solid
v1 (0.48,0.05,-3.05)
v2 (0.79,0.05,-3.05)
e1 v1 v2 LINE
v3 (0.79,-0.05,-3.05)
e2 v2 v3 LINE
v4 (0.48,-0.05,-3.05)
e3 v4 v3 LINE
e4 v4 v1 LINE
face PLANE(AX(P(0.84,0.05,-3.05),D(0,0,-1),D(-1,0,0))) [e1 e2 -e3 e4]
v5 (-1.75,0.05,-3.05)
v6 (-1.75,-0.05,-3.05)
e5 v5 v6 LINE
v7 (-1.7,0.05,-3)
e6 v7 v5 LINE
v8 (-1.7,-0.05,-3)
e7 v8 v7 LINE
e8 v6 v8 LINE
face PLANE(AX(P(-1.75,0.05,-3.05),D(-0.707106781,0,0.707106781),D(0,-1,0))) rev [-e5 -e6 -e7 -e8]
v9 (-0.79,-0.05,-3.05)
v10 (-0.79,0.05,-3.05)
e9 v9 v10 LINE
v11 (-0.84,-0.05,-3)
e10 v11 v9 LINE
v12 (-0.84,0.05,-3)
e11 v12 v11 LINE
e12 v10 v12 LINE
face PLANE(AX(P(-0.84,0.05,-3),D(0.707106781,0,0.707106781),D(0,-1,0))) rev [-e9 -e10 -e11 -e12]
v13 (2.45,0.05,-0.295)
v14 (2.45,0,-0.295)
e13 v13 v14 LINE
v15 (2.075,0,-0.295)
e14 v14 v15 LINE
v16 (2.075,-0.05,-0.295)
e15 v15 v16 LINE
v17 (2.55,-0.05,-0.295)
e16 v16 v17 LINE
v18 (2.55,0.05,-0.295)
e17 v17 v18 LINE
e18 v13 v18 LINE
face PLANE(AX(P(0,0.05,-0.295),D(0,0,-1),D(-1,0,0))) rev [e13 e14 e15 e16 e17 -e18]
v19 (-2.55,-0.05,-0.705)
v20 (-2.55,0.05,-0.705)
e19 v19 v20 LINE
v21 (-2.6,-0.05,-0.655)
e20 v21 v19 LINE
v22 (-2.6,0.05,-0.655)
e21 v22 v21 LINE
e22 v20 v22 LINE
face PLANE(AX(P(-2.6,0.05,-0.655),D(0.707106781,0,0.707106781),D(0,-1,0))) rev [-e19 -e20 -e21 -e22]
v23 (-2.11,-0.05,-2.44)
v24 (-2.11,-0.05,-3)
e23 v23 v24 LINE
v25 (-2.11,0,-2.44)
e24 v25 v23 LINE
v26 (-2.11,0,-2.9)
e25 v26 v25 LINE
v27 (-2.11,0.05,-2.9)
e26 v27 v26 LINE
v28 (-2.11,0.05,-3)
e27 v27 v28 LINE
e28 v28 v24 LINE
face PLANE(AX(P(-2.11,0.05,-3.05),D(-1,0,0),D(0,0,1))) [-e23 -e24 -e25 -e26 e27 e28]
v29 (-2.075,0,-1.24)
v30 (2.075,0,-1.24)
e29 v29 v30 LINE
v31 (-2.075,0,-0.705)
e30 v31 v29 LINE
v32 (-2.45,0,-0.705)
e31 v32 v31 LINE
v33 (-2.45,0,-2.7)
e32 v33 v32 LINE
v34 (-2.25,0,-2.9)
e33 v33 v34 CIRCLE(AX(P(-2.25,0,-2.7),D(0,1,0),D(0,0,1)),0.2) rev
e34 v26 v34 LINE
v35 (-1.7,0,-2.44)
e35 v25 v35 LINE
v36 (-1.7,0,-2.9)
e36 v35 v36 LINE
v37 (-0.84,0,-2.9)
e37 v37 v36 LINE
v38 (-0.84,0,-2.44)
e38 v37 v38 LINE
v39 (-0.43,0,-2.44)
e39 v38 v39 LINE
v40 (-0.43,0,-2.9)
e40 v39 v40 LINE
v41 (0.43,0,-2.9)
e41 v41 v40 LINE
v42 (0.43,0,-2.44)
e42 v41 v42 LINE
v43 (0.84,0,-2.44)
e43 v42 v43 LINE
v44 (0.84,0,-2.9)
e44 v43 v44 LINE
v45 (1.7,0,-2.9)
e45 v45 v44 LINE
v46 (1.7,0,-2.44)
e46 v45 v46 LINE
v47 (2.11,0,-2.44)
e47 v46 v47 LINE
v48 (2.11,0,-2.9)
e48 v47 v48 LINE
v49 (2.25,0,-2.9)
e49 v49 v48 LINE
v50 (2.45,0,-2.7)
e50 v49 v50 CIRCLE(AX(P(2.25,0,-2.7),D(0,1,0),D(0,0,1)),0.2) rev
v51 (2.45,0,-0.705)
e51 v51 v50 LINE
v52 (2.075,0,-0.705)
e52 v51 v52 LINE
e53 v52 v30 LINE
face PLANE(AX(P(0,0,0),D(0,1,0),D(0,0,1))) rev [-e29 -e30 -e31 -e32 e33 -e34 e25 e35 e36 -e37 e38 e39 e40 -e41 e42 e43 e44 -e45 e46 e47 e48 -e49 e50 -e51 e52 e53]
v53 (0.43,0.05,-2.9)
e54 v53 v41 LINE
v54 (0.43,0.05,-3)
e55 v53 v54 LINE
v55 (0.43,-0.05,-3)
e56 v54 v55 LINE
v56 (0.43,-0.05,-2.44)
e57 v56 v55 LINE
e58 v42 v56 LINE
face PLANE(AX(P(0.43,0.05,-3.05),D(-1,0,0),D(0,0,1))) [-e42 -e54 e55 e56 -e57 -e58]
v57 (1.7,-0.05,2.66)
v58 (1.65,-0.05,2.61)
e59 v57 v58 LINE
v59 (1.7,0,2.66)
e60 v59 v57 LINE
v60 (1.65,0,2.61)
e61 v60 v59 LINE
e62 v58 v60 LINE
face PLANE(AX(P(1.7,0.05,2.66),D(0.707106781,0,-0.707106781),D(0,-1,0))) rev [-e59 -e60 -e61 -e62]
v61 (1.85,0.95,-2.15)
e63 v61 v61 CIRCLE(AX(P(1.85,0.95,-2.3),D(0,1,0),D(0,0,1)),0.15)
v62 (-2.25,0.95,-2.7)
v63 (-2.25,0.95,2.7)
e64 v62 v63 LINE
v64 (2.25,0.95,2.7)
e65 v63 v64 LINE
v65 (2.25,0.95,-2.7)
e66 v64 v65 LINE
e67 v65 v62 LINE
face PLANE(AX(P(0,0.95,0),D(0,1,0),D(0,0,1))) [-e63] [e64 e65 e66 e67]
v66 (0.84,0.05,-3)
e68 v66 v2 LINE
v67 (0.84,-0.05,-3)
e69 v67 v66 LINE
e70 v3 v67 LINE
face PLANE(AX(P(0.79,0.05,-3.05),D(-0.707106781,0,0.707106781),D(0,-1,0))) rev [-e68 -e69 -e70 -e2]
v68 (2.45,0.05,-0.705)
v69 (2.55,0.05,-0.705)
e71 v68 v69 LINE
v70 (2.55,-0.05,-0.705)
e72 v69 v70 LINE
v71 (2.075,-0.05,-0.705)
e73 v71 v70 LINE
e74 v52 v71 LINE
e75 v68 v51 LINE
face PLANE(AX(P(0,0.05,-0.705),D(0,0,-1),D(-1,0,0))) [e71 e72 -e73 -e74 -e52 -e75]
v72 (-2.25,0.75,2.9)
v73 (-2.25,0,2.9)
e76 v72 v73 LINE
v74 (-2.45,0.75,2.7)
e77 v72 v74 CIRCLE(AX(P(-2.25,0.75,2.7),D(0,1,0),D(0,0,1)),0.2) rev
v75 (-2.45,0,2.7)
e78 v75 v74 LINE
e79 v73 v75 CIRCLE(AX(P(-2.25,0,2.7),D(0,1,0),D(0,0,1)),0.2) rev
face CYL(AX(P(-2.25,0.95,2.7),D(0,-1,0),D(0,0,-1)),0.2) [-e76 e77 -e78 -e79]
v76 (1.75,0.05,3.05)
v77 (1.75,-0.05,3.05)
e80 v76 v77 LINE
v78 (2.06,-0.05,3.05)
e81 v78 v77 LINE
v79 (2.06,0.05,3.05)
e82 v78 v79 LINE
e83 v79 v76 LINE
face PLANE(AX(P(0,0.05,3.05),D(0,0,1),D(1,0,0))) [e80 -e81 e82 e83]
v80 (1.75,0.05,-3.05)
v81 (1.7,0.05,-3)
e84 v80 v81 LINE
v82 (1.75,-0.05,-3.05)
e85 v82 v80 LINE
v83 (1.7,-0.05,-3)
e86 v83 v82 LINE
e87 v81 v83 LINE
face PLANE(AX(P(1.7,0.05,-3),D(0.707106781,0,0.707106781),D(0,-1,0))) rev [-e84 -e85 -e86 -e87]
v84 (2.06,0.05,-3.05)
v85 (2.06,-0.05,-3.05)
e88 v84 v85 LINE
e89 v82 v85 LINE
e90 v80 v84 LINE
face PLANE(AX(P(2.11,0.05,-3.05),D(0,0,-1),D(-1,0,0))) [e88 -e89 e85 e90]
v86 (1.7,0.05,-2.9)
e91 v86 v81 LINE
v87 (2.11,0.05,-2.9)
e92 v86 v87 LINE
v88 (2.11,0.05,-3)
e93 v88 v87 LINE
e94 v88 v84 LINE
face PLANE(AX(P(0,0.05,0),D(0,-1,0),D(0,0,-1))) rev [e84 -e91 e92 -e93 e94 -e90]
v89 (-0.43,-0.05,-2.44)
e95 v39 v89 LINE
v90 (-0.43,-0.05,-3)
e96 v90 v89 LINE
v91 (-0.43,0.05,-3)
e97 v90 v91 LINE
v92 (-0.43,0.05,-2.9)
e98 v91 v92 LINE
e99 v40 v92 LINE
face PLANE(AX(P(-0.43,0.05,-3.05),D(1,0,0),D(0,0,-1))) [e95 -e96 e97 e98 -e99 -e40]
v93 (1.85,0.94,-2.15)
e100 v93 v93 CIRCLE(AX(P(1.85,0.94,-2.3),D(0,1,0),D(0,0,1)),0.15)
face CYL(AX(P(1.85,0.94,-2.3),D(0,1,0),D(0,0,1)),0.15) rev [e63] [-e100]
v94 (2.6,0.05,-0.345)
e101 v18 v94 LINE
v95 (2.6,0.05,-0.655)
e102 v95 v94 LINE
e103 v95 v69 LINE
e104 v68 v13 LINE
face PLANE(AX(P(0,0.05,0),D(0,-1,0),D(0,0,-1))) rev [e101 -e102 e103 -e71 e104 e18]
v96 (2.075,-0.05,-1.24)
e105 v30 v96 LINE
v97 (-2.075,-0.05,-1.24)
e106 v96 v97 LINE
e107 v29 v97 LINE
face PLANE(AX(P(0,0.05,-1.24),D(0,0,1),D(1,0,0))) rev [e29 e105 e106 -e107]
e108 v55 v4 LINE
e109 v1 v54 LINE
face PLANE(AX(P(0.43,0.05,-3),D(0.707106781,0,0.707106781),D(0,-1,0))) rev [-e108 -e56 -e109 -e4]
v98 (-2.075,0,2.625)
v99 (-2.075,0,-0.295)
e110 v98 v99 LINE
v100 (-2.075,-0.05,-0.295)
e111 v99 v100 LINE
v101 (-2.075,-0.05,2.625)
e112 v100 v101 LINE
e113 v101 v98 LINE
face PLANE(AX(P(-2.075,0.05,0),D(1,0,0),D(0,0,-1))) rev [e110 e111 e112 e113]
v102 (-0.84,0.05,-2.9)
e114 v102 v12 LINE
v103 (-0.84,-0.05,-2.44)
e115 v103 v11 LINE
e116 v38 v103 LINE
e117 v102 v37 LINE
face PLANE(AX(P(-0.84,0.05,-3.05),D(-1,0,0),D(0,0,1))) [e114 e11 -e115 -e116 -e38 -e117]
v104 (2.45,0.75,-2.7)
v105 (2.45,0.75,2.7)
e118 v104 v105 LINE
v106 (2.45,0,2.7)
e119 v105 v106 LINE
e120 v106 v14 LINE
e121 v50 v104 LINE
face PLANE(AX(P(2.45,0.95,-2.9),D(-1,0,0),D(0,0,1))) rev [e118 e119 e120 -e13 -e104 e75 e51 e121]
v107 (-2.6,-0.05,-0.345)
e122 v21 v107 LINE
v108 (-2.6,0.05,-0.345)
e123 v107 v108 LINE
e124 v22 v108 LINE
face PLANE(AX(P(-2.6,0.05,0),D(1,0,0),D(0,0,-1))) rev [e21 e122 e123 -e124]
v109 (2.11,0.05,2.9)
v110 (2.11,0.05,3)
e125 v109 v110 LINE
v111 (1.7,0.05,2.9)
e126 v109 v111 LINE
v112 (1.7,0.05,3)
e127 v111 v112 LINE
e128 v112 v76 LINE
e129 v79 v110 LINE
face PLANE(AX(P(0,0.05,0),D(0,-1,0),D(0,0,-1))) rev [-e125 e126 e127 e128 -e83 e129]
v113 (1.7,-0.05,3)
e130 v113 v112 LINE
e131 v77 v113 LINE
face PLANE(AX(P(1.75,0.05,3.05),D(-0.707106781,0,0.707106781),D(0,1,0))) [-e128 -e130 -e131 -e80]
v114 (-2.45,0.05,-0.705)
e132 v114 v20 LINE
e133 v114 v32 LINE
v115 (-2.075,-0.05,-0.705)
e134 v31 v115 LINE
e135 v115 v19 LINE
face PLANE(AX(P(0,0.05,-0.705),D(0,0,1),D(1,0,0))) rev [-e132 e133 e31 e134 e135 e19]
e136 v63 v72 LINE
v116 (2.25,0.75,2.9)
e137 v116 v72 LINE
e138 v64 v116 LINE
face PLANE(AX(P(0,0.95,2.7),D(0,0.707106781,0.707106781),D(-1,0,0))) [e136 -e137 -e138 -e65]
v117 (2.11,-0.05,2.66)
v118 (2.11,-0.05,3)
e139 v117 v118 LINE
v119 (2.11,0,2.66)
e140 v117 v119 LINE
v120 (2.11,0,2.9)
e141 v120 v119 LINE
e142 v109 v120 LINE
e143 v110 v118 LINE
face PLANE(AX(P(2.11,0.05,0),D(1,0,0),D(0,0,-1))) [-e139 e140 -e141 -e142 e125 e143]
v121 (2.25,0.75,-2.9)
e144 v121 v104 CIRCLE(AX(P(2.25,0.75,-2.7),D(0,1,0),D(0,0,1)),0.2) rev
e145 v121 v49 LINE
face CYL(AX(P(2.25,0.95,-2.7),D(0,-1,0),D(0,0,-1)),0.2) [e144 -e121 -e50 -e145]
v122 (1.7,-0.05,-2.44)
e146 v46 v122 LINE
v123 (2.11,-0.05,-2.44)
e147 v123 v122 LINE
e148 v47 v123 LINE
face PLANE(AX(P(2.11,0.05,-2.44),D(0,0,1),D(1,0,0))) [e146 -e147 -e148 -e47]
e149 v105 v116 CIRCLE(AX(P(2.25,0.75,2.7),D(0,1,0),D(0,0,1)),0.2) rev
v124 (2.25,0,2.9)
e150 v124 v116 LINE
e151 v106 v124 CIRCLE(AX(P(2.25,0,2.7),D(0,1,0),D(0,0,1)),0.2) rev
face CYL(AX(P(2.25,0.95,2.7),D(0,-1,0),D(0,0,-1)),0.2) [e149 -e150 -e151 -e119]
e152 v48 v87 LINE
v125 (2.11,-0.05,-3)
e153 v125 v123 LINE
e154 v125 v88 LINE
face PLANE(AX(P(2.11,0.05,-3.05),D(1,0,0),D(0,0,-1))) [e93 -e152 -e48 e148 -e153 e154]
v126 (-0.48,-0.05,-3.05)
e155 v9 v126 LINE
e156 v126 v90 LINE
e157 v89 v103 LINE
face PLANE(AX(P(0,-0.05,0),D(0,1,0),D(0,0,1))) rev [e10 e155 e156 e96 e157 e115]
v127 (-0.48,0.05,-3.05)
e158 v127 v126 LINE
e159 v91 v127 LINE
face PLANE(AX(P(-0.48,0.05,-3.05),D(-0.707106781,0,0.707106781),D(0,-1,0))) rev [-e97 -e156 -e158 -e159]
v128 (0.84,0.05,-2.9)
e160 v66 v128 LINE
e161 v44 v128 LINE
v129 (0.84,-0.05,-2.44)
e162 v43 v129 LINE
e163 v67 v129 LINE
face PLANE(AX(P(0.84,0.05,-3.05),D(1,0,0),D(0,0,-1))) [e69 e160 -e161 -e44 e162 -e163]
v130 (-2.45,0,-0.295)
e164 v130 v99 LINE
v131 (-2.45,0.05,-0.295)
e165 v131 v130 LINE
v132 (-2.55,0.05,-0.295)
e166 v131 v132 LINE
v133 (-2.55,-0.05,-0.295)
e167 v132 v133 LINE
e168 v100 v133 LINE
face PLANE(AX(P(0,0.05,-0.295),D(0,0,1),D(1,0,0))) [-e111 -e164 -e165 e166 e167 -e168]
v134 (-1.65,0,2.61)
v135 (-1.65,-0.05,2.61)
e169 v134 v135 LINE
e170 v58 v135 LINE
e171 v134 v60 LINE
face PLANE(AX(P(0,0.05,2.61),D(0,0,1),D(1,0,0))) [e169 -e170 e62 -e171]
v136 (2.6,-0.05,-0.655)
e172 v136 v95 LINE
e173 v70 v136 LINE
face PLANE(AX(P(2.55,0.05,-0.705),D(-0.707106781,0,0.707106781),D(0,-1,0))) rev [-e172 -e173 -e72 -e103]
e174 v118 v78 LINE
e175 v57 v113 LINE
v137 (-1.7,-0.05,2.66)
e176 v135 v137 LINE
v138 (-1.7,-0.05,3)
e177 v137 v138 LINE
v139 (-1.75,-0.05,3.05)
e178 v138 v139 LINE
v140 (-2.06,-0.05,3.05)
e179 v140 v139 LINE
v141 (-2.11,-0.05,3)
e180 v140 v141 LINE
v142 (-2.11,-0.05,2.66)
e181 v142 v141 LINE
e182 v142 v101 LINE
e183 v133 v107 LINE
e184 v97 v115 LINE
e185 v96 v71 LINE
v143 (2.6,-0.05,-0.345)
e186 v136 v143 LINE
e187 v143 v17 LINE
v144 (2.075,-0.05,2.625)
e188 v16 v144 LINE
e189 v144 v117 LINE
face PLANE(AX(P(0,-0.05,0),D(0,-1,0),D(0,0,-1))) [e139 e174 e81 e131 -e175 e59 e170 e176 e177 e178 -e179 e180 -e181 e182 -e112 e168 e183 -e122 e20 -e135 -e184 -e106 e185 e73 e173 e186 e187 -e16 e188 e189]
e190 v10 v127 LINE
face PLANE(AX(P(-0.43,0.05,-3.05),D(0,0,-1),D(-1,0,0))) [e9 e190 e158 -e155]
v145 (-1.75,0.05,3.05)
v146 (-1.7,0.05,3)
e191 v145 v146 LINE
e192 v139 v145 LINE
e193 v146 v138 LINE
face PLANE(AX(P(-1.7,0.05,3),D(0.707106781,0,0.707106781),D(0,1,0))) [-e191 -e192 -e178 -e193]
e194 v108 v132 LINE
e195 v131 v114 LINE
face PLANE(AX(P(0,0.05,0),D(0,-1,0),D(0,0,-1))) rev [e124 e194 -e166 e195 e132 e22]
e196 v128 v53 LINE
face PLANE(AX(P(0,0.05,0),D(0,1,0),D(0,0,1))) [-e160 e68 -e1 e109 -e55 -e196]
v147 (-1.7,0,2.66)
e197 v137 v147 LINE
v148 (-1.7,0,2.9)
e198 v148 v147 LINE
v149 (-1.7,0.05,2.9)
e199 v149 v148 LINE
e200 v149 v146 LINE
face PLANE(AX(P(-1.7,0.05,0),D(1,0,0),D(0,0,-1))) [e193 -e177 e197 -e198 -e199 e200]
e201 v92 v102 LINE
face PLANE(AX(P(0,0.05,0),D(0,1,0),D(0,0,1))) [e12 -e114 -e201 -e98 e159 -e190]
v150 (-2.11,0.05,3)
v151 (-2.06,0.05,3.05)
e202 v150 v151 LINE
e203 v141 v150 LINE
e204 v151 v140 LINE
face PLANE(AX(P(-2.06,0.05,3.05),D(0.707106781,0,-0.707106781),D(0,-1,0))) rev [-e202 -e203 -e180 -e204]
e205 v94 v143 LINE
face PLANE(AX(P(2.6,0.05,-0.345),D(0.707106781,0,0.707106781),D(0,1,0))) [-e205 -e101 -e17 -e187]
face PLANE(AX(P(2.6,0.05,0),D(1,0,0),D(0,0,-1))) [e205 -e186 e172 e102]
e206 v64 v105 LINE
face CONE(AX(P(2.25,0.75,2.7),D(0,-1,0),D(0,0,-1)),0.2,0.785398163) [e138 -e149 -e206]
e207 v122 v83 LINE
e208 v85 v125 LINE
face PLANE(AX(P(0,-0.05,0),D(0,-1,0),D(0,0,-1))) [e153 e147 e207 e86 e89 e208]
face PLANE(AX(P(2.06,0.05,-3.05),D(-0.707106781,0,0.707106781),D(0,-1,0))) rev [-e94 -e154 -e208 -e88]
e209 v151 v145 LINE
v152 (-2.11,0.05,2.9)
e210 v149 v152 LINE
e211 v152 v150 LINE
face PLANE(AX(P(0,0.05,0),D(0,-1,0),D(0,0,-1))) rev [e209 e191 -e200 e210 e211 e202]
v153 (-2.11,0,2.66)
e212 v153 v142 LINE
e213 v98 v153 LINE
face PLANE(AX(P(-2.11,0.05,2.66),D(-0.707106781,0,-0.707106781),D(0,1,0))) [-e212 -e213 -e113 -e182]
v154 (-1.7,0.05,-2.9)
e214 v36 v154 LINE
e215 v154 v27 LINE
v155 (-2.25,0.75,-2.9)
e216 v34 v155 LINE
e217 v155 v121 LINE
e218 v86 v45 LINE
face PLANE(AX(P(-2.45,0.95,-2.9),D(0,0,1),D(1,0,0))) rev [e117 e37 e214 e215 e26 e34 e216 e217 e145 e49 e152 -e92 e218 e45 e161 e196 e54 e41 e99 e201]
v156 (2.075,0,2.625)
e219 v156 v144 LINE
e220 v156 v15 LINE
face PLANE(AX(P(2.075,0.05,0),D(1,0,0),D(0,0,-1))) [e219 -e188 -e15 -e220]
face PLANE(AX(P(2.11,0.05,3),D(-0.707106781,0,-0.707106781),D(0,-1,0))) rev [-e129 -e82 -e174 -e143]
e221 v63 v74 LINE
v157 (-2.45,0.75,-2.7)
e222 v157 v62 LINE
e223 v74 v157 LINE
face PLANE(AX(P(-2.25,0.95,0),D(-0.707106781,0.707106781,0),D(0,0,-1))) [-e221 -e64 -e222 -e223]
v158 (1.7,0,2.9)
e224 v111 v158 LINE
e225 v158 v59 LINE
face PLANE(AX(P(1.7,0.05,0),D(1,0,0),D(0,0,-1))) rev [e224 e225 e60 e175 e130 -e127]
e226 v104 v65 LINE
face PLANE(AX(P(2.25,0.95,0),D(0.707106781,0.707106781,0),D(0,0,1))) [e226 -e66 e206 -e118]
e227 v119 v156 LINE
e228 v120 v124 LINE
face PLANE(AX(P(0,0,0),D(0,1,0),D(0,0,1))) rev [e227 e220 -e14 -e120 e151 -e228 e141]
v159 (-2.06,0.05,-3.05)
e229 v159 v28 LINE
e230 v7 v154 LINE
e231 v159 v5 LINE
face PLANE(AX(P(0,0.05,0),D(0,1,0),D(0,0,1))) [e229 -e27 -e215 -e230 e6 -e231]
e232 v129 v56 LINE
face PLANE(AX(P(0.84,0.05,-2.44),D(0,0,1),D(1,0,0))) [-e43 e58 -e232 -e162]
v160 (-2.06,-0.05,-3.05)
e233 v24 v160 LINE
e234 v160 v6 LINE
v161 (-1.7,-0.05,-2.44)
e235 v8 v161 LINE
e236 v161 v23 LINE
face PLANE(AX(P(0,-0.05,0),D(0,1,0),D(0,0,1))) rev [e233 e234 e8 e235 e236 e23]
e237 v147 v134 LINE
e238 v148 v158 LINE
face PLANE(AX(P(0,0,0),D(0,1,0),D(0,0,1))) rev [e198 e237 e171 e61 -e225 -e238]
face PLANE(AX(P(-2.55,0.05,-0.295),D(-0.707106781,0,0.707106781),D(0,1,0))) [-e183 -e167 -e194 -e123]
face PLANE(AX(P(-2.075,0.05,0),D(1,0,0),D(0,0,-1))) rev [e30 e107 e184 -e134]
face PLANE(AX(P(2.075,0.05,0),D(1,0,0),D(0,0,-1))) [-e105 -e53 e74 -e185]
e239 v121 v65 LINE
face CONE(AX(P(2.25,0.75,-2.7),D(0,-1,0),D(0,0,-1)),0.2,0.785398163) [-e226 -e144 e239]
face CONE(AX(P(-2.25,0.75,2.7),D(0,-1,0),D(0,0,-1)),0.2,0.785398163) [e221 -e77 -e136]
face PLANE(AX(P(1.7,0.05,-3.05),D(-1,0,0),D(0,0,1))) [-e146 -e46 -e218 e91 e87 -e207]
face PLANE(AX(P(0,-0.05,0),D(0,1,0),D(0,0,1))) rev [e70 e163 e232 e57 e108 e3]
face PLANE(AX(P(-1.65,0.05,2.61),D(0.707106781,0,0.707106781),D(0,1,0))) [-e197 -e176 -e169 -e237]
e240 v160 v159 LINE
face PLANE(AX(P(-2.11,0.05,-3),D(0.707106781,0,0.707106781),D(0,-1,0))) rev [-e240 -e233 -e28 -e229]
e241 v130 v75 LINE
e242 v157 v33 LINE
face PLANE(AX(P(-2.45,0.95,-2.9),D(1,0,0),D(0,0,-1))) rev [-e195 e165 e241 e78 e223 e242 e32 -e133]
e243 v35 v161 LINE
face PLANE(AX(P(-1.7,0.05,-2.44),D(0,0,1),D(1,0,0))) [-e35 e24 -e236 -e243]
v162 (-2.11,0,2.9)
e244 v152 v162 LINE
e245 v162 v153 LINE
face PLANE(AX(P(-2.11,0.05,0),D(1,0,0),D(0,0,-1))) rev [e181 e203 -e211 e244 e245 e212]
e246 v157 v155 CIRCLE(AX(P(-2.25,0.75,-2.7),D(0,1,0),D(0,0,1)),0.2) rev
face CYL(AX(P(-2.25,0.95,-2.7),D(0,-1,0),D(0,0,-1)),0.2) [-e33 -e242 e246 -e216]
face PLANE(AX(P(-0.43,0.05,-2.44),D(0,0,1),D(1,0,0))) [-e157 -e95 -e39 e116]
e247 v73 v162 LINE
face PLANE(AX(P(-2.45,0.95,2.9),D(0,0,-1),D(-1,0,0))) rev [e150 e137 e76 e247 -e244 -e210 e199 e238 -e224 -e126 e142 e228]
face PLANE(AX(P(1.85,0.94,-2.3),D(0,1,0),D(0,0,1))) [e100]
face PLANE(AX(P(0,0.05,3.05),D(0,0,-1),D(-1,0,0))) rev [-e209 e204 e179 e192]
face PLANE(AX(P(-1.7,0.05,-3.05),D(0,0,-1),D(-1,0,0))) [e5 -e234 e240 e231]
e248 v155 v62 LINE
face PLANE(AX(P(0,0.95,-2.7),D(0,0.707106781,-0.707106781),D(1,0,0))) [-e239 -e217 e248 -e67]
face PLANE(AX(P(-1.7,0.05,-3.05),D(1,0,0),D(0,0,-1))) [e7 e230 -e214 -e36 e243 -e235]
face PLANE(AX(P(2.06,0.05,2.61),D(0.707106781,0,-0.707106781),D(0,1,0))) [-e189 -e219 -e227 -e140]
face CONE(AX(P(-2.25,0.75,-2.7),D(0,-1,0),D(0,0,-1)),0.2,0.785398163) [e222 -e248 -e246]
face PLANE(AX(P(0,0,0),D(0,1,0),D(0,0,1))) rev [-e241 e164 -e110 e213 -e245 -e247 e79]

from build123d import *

# Parameters (mm, degrees)
SKETCH_1_W           = 4.9
SKETCH_1_H           = 5.8
EXTRUDE_1_DEPTH      = 0.95
FILLET_1_R           = 0.2
CHAMFER_1_SIZE       = 0.2
EXTRUDE_2_DEPTH      = 0.05
EXTRUDE_2_DEPTH_BACK = 0.05
SKETCH_2_W           = 0.41
SKETCH_2_H           = 0.61
CHAMFER_2_SIZE       = 0.05
EXTRUDE_3_DEPTH      = 0.05
EXTRUDE_3_DEPTH_BACK = 0.05
SKETCH_3_W           = 4.15
SKETCH_3_H           = 3.85
SKETCH_3_W_2         = 0.41
SKETCH_3_H_2         = 0.15
SKETCH_3_W_3         = 0.375
SKETCH_3_H_3         = 0.41
SKETCH_3_W_4         = 0.15
CHAMFER_3_SIZE       = 0.05
SKETCH_4_R           = 0.15
CUT_EXTRUDE_1_DEPTH  = 0.01


with BuildPart() as part:
    # Эскиз1 → Бобышка-Вытянуть1 (new body)
    with BuildSketch(Plane(origin=(0, 0, 0), x_dir=(1, 0, 0), z_dir=(0, 1, 0))):
        Rectangle(SKETCH_1_W, SKETCH_1_H)
    extrude(amount=EXTRUDE_1_DEPTH)

    # Скругление1
    fillet_1_edges = [part.edges().sort_by_distance(p)[0] for p in [
        (2.45, 0.475, 2.9),
        (-2.45, 0.475, 2.9),
        (-2.45, 0.475, -2.9),
        (2.45, 0.475, -2.9),
    ]]
    fillet(fillet_1_edges, radius=FILLET_1_R)

    # Фаска1
    chamfer_1_edges = [part.edges().sort_by_distance(p)[0] for p in [
        (-2.45, 0.95, 0),
        (0, 0.95, -2.9),
        (2.45, 0.95, 0),
        (0, 0.95, 2.9),
        (2.391421356, 0.95, 2.841421356),
        (-2.391421356, 0.95, 2.841421356),
        (2.391421356, 0.95, -2.841421356),
        (-2.391421356, 0.95, -2.841421356),
    ]]
    chamfer(chamfer_1_edges, length=CHAMFER_1_SIZE)

    # Эскиз2 → Бобышка-Вытянуть2 (add, two sides: drawn at the far end of the back side and taken through both)
    with BuildSketch(Plane.XZ.offset(-EXTRUDE_2_DEPTH_BACK)):
        with Locations((0.635, -2.745)):
            Rectangle(SKETCH_2_W, SKETCH_2_H)
        with Locations((1.905, -2.745)):
            Rectangle(SKETCH_2_W, SKETCH_2_H)
        with Locations((-0.635, -2.745)):
            Rectangle(SKETCH_2_W, SKETCH_2_H)
        with Locations((-1.905, -2.745)):
            Rectangle(SKETCH_2_W, SKETCH_2_H)
    extrude(amount=EXTRUDE_2_DEPTH + EXTRUDE_2_DEPTH_BACK)

    # Фаска2
    chamfer_2_edges = [part.edges().sort_by_distance(p)[0] for p in [
        (-2.11, 0, -3.05),
        (-1.7, 0, -3.05),
        (1.7, 0, -3.05),
        (2.11, 0, -3.05),
        (0.43, 0, -3.05),
        (0.84, 0, -3.05),
        (-0.84, 0, -3.05),
        (-0.43, 0, -3.05),
    ]]
    chamfer(chamfer_2_edges, length=CHAMFER_2_SIZE)

    # Эскиз3 → Бобышка-Вытянуть3 (add, two sides: drawn at the far end of the back side and taken through both)
    with BuildSketch(Plane.XZ.offset(-EXTRUDE_3_DEPTH_BACK)):
        with Locations((0, 0.685)):
            Rectangle(SKETCH_3_W, SKETCH_3_H)
        with Locations((1.905, 2.975)):
            Rectangle(SKETCH_3_W_2, SKETCH_3_H_2)
        Polygon((1.7, 2.61), (2.075, 2.61), (2.11, 2.61), (2.11, 2.9), (1.7, 2.9), align=None)
        with Locations((-1.905, 2.975)):
            Rectangle(SKETCH_3_W_2, SKETCH_3_H_2)
        Polygon((-2.11, 2.61), (-2.075, 2.61), (-1.7, 2.61), (-1.7, 2.9), (-2.11, 2.9), align=None)
        with Locations((2.2625, -0.5)):
            Rectangle(SKETCH_3_W_3, SKETCH_3_H_3)
        with Locations((2.525, -0.5)):
            Rectangle(SKETCH_3_W_4, SKETCH_3_H_3)
        with Locations((-2.2625, -0.5)):
            Rectangle(SKETCH_3_W_3, SKETCH_3_H_3)
        with Locations((-2.525, -0.5)):
            Rectangle(SKETCH_3_W_4, SKETCH_3_H_3)
    extrude(amount=EXTRUDE_3_DEPTH + EXTRUDE_3_DEPTH_BACK)

    # Фаска3
    # the kernel refuses this chamfer: 0.05 mm, written as the material it adds along each edge
    with BuildSketch(Plane(origin=(-1.7, -0.05, 2.61), x_dir=(-0.02749587661058742, 0, 0.9996219169112966), z_dir=(0, 1, 0)), Plane(origin=(1.7, -0.05, 2.61), x_dir=(-0.9996219169112966, 0, -0.02749587661058718), z_dir=(0, 1, 0))) as chamfer_3_piece_1:
        Polygon((CHAMFER_3_SIZE * 0.999621916911, CHAMFER_3_SIZE * 0.0274958766106), (-CHAMFER_3_SIZE * 0.0274958766106, CHAMFER_3_SIZE * 0.999621916911), (0, 0), align=None)
    extrude(amount=0.178584149)
    # the kernel refuses this chamfer: 0.05 mm, written as the material it takes off along each edge
    with BuildSketch(Plane(origin=(-2.6, -0.178584149, -0.295), x_dir=(0.9996219169112966, 0, 0.02749587661058634), z_dir=(0, 1, 0)), Plane(origin=(2.6, -0.178584149, -0.705), x_dir=(-0.9996219169112965, 0, -0.027495876610591732), z_dir=(0, 1, 0)), Plane(origin=(2.6, -0.178584149, -0.295), x_dir=(0.02749587661058736, 0, -0.9996219169112966), z_dir=(0, 1, 0))) as chamfer_3_2_piece_1:
        Polygon((CHAMFER_3_SIZE * 0.999621916911, CHAMFER_3_SIZE * 0.0274958766106), (-CHAMFER_3_SIZE * 0.0274958766106, CHAMFER_3_SIZE * 0.999621916911), (0, 0), align=None)
    extrude(amount=0.357168299, mode=Mode.SUBTRACT)
    with BuildSketch(Plane(origin=(-2.11, -0.178584149, 2.61), x_dir=(-0.02749587661058742, 0, 0.9996219169112966), z_dir=(0, 1, 0))) as chamfer_3_2_piece_2_section:
        Polygon((CHAMFER_3_SIZE * 0.999621916911, CHAMFER_3_SIZE * 0.0274958766106), (-CHAMFER_3_SIZE * 0.0274958766106, CHAMFER_3_SIZE * 0.999621916911), (0, 0), align=None)
    chamfer_3_2_piece_2 = extrude(amount=0.178584149, mode=Mode.PRIVATE)
    chamfer_3_2_piece_2 = split(chamfer_3_2_piece_2, bisect_by=Plane(origin=(-2.075, -0.025, 2.627820513), z_dir=(-1, 0, 0)), keep=Keep.TOP, mode=Mode.PRIVATE)
    add(chamfer_3_2_piece_2, mode=Mode.SUBTRACT)
    with BuildSketch(Plane(origin=(-1.7, -0.178584149, 3.05), x_dir=(-0.9996219169112966, 0, 0.027495876610587302), z_dir=(0, 1, 0)), Plane(origin=(2.11, -0.178584149, 3.05), x_dir=(-0.9996219169112966, 0, 0.02749587661058742), z_dir=(0, 1, 0)), Plane(origin=(-2.6, -0.178584149, -0.705), x_dir=(0.9996219169112966, 0, -0.02749587661058742), z_dir=(0, 1, 0)), Plane(origin=(-2.11, -0.178584149, 3.05), x_dir=(-0.02749587661058742, 0, -0.9996219169112966), z_dir=(0, 1, 0)), Plane(origin=(1.7, -0.178584149, 3.05), x_dir=(-0.027495876610591732, 0, -0.9996219169112965), z_dir=(0, 1, 0))) as chamfer_3_2_piece_3:
        Polygon((CHAMFER_3_SIZE * 0.999621916911, -CHAMFER_3_SIZE * 0.0274958766106), (-CHAMFER_3_SIZE * 0.0274958766106, -CHAMFER_3_SIZE * 0.999621916911), (0, 0), align=None)
    extrude(amount=0.357168299, mode=Mode.SUBTRACT)
    with BuildSketch(Plane(origin=(2.11, -0.178584149, 2.61), x_dir=(0.02749587661058742, 0, 0.9996219169112966), z_dir=(0, 1, 0))) as chamfer_3_2_piece_4_section:
        Polygon((CHAMFER_3_SIZE * 0.999621916911, -CHAMFER_3_SIZE * 0.0274958766106), (-CHAMFER_3_SIZE * 0.0274958766106, -CHAMFER_3_SIZE * 0.999621916911), (0, 0), align=None)
    chamfer_3_2_piece_4 = extrude(amount=0.178584149, mode=Mode.PRIVATE)
    chamfer_3_2_piece_4 = split(chamfer_3_2_piece_4, bisect_by=Plane(origin=(2.075, -0.025, 2.627820513), z_dir=(1, 0, 0)), keep=Keep.TOP, mode=Mode.PRIVATE)
    add(chamfer_3_2_piece_4, mode=Mode.SUBTRACT)

    # Эскиз4 → Вырез-Вытянуть1 (cut)
    with BuildSketch(Plane(origin=(0, 0.95, 0), x_dir=(1, 0, 0), z_dir=(0, 1, 0))):
        with Locations(Location((1.85, 2.3, 0), (0, 0, 270))):
            Circle(SKETCH_4_R)
    extrude(amount=-CUT_EXTRUDE_1_DEPTH, mode=Mode.SUBTRACT)


solid = part.part
